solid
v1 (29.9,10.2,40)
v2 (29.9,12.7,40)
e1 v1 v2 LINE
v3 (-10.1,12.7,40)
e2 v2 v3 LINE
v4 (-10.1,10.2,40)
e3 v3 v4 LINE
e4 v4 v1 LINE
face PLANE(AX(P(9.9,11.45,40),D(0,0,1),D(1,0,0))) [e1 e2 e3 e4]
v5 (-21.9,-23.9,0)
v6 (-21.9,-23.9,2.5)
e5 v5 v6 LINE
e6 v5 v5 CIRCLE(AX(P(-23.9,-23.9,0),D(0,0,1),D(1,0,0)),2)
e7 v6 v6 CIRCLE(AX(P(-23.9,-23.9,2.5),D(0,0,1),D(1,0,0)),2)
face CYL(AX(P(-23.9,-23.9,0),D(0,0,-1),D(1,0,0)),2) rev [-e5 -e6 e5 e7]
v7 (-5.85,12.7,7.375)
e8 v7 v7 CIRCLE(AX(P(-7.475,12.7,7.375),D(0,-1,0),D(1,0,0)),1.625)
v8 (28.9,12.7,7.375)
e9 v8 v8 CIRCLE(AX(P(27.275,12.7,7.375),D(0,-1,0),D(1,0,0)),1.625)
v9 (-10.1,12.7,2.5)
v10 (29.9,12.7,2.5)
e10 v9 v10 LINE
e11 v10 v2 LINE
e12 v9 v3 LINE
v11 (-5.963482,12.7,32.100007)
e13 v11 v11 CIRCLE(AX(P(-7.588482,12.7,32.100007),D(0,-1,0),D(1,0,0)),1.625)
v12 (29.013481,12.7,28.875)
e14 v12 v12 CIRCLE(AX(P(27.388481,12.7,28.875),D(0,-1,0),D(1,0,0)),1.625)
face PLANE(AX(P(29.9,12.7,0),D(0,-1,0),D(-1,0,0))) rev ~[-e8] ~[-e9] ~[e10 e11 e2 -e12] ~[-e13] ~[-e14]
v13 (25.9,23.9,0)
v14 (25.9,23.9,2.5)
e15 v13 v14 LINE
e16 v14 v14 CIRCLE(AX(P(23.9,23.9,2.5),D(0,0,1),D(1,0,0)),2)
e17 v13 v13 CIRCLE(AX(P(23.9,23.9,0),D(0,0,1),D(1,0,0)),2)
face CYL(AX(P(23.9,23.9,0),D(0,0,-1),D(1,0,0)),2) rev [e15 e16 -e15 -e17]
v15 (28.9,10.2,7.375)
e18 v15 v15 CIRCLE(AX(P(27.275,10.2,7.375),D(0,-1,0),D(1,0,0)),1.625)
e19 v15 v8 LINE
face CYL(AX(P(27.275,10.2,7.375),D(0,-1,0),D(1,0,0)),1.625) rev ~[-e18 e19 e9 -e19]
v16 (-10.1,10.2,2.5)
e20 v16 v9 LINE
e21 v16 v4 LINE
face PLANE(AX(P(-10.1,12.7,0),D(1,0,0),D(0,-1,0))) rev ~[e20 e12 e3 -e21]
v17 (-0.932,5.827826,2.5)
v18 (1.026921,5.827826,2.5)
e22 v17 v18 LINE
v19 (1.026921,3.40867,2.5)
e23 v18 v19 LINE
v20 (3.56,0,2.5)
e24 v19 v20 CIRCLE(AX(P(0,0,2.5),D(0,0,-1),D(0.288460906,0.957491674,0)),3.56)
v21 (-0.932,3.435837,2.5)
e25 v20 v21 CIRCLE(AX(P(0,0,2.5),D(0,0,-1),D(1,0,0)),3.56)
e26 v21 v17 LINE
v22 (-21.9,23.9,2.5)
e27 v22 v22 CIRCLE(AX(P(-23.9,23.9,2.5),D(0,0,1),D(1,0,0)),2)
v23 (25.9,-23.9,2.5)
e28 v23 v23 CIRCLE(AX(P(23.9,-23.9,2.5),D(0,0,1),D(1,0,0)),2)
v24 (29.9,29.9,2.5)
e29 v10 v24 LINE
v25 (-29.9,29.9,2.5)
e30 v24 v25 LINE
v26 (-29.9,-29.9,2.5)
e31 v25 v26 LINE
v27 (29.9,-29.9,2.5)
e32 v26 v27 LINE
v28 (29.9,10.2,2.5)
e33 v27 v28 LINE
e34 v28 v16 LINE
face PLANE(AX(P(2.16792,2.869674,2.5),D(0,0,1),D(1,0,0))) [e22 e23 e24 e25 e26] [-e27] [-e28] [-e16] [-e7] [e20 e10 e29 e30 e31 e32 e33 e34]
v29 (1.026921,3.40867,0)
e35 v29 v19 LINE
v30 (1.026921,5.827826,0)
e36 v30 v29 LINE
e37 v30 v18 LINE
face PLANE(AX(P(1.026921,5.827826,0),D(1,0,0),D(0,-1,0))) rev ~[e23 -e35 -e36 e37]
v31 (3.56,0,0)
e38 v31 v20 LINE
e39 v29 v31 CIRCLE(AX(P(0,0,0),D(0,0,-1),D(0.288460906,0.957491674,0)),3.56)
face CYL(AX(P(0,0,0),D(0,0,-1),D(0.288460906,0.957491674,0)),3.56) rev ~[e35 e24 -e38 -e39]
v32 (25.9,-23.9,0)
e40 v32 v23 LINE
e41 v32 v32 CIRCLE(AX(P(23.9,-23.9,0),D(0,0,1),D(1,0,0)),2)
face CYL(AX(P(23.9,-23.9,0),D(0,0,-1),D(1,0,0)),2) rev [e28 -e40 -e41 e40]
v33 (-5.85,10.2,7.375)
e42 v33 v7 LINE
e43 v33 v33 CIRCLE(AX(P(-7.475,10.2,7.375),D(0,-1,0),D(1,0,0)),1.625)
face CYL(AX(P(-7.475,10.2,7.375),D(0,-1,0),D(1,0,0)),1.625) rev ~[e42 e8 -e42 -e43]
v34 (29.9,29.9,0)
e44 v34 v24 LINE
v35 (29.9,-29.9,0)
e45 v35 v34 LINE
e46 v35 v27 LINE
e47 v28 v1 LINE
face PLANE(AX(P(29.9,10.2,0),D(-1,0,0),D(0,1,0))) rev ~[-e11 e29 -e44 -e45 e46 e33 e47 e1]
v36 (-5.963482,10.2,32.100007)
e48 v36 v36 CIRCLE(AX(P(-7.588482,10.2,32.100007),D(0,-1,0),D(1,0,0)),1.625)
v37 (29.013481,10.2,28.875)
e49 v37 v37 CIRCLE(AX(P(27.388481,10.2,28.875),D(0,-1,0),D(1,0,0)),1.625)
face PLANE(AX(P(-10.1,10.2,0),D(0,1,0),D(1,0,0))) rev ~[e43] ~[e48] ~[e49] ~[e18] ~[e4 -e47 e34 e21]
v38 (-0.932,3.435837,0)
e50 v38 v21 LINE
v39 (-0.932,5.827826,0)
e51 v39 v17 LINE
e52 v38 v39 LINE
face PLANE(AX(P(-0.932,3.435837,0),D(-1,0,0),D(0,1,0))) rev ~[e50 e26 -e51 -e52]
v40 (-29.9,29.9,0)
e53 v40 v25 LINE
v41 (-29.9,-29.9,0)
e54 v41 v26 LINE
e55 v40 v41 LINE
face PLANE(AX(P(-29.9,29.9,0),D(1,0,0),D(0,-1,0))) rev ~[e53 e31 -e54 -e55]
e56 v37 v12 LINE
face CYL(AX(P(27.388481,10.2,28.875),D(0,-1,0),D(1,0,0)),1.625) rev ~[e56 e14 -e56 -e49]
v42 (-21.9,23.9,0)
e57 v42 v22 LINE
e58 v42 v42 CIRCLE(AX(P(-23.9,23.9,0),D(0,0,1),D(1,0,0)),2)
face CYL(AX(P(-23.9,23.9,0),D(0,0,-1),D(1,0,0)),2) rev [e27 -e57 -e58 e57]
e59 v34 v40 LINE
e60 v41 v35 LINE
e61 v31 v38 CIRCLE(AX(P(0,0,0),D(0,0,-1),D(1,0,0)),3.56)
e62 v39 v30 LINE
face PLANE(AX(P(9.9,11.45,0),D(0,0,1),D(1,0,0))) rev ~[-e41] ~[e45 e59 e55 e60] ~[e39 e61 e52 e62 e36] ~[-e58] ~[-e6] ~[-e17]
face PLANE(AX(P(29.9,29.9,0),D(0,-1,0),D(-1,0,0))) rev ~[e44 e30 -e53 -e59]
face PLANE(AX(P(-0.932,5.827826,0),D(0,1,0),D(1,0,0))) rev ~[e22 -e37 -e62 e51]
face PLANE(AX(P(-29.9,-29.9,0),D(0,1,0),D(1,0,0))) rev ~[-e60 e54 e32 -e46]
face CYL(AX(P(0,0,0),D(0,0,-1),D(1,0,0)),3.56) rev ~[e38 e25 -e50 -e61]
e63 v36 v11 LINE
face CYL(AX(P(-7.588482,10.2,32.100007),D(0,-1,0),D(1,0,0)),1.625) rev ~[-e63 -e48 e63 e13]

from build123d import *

# Parameters (mm, degrees)
F0_R     = 2
F1_DEPTH = 2.5
F2_DEPTH = 40
F3_R     = 1.625
F4_DEPTH = 25


# Not quite as in the source:
# - a feature names something its author has since deleted; it is built from what else it names


with BuildPart() as f1:
    # F0 (on Top) → F1 (new body)
    with BuildSketch(Plane.XY):
        Polygon((29.9, 29.9), (-29.9, 29.9), (-29.9, -29.9), (29.9, -29.9), (29.9, 10.2), (1.0269208253, 10.2), (0.8924006252, 10.2), (-0.932000461, 10.2), (-10.1, 10.2), (-10.1, 12.7), (29.9, 12.7), align=None)
        with Locations((-23.9, -23.9)):
            Circle(F0_R, mode=Mode.SUBTRACT)
        with Locations((23.9, -23.9)):
            Circle(F0_R, mode=Mode.SUBTRACT)
        with BuildLine():
            ThreePointArc((1.0269208253, 3.4086703593), (2.8573972543, 2.1234125673), (3.56, 0))
            ThreePointArc((3.56, 0), (-2.1628312878, -2.8276776373), (-0.932000461, 3.4358368909))
            Line((-0.932000461, 3.4358368909), (-0.932000461, 5.8278255165))
            Line((-0.932000461, 5.8278255165), (1.0269208253, 5.8278255165))
            Line((1.0269208253, 5.8278255165), (1.0269208253, 3.4086703593))
        make_face(mode=Mode.SUBTRACT)
        with Locations((-23.9, 23.9)):
            Circle(F0_R, mode=Mode.SUBTRACT)
        with Locations((23.9, 23.9)):
            Circle(F0_R, mode=Mode.SUBTRACT)
    extrude(amount=F1_DEPTH)

    # F0 (on Top) → F2 (join)
    with BuildSketch(Plane.XY):
        Polygon((29.9, 10.2), (29.9, 12.7), (-10.1, 12.7), (-10.1, 10.2), (-0.932000461, 10.2), (0.8924006252, 10.2), (1.0269208253, 10.2), align=None)
    extrude(amount=F2_DEPTH)

    # F3 (on face) → F4 (cut)
    with BuildSketch(Plane.XZ.offset(-10.2)):
        with Locations((-7.5884815305, 32.100006938)):
            Circle(F3_R)
        with Locations((-7.475, 7.375)):
            Circle(F3_R)
        with Locations((27.3884814233, 28.875)):
            Circle(F3_R)
        with Locations((27.275, 7.375)):
            Circle(F3_R)
    extrude(amount=-F4_DEPTH, mode=Mode.SUBTRACT)


solid = f1.part
